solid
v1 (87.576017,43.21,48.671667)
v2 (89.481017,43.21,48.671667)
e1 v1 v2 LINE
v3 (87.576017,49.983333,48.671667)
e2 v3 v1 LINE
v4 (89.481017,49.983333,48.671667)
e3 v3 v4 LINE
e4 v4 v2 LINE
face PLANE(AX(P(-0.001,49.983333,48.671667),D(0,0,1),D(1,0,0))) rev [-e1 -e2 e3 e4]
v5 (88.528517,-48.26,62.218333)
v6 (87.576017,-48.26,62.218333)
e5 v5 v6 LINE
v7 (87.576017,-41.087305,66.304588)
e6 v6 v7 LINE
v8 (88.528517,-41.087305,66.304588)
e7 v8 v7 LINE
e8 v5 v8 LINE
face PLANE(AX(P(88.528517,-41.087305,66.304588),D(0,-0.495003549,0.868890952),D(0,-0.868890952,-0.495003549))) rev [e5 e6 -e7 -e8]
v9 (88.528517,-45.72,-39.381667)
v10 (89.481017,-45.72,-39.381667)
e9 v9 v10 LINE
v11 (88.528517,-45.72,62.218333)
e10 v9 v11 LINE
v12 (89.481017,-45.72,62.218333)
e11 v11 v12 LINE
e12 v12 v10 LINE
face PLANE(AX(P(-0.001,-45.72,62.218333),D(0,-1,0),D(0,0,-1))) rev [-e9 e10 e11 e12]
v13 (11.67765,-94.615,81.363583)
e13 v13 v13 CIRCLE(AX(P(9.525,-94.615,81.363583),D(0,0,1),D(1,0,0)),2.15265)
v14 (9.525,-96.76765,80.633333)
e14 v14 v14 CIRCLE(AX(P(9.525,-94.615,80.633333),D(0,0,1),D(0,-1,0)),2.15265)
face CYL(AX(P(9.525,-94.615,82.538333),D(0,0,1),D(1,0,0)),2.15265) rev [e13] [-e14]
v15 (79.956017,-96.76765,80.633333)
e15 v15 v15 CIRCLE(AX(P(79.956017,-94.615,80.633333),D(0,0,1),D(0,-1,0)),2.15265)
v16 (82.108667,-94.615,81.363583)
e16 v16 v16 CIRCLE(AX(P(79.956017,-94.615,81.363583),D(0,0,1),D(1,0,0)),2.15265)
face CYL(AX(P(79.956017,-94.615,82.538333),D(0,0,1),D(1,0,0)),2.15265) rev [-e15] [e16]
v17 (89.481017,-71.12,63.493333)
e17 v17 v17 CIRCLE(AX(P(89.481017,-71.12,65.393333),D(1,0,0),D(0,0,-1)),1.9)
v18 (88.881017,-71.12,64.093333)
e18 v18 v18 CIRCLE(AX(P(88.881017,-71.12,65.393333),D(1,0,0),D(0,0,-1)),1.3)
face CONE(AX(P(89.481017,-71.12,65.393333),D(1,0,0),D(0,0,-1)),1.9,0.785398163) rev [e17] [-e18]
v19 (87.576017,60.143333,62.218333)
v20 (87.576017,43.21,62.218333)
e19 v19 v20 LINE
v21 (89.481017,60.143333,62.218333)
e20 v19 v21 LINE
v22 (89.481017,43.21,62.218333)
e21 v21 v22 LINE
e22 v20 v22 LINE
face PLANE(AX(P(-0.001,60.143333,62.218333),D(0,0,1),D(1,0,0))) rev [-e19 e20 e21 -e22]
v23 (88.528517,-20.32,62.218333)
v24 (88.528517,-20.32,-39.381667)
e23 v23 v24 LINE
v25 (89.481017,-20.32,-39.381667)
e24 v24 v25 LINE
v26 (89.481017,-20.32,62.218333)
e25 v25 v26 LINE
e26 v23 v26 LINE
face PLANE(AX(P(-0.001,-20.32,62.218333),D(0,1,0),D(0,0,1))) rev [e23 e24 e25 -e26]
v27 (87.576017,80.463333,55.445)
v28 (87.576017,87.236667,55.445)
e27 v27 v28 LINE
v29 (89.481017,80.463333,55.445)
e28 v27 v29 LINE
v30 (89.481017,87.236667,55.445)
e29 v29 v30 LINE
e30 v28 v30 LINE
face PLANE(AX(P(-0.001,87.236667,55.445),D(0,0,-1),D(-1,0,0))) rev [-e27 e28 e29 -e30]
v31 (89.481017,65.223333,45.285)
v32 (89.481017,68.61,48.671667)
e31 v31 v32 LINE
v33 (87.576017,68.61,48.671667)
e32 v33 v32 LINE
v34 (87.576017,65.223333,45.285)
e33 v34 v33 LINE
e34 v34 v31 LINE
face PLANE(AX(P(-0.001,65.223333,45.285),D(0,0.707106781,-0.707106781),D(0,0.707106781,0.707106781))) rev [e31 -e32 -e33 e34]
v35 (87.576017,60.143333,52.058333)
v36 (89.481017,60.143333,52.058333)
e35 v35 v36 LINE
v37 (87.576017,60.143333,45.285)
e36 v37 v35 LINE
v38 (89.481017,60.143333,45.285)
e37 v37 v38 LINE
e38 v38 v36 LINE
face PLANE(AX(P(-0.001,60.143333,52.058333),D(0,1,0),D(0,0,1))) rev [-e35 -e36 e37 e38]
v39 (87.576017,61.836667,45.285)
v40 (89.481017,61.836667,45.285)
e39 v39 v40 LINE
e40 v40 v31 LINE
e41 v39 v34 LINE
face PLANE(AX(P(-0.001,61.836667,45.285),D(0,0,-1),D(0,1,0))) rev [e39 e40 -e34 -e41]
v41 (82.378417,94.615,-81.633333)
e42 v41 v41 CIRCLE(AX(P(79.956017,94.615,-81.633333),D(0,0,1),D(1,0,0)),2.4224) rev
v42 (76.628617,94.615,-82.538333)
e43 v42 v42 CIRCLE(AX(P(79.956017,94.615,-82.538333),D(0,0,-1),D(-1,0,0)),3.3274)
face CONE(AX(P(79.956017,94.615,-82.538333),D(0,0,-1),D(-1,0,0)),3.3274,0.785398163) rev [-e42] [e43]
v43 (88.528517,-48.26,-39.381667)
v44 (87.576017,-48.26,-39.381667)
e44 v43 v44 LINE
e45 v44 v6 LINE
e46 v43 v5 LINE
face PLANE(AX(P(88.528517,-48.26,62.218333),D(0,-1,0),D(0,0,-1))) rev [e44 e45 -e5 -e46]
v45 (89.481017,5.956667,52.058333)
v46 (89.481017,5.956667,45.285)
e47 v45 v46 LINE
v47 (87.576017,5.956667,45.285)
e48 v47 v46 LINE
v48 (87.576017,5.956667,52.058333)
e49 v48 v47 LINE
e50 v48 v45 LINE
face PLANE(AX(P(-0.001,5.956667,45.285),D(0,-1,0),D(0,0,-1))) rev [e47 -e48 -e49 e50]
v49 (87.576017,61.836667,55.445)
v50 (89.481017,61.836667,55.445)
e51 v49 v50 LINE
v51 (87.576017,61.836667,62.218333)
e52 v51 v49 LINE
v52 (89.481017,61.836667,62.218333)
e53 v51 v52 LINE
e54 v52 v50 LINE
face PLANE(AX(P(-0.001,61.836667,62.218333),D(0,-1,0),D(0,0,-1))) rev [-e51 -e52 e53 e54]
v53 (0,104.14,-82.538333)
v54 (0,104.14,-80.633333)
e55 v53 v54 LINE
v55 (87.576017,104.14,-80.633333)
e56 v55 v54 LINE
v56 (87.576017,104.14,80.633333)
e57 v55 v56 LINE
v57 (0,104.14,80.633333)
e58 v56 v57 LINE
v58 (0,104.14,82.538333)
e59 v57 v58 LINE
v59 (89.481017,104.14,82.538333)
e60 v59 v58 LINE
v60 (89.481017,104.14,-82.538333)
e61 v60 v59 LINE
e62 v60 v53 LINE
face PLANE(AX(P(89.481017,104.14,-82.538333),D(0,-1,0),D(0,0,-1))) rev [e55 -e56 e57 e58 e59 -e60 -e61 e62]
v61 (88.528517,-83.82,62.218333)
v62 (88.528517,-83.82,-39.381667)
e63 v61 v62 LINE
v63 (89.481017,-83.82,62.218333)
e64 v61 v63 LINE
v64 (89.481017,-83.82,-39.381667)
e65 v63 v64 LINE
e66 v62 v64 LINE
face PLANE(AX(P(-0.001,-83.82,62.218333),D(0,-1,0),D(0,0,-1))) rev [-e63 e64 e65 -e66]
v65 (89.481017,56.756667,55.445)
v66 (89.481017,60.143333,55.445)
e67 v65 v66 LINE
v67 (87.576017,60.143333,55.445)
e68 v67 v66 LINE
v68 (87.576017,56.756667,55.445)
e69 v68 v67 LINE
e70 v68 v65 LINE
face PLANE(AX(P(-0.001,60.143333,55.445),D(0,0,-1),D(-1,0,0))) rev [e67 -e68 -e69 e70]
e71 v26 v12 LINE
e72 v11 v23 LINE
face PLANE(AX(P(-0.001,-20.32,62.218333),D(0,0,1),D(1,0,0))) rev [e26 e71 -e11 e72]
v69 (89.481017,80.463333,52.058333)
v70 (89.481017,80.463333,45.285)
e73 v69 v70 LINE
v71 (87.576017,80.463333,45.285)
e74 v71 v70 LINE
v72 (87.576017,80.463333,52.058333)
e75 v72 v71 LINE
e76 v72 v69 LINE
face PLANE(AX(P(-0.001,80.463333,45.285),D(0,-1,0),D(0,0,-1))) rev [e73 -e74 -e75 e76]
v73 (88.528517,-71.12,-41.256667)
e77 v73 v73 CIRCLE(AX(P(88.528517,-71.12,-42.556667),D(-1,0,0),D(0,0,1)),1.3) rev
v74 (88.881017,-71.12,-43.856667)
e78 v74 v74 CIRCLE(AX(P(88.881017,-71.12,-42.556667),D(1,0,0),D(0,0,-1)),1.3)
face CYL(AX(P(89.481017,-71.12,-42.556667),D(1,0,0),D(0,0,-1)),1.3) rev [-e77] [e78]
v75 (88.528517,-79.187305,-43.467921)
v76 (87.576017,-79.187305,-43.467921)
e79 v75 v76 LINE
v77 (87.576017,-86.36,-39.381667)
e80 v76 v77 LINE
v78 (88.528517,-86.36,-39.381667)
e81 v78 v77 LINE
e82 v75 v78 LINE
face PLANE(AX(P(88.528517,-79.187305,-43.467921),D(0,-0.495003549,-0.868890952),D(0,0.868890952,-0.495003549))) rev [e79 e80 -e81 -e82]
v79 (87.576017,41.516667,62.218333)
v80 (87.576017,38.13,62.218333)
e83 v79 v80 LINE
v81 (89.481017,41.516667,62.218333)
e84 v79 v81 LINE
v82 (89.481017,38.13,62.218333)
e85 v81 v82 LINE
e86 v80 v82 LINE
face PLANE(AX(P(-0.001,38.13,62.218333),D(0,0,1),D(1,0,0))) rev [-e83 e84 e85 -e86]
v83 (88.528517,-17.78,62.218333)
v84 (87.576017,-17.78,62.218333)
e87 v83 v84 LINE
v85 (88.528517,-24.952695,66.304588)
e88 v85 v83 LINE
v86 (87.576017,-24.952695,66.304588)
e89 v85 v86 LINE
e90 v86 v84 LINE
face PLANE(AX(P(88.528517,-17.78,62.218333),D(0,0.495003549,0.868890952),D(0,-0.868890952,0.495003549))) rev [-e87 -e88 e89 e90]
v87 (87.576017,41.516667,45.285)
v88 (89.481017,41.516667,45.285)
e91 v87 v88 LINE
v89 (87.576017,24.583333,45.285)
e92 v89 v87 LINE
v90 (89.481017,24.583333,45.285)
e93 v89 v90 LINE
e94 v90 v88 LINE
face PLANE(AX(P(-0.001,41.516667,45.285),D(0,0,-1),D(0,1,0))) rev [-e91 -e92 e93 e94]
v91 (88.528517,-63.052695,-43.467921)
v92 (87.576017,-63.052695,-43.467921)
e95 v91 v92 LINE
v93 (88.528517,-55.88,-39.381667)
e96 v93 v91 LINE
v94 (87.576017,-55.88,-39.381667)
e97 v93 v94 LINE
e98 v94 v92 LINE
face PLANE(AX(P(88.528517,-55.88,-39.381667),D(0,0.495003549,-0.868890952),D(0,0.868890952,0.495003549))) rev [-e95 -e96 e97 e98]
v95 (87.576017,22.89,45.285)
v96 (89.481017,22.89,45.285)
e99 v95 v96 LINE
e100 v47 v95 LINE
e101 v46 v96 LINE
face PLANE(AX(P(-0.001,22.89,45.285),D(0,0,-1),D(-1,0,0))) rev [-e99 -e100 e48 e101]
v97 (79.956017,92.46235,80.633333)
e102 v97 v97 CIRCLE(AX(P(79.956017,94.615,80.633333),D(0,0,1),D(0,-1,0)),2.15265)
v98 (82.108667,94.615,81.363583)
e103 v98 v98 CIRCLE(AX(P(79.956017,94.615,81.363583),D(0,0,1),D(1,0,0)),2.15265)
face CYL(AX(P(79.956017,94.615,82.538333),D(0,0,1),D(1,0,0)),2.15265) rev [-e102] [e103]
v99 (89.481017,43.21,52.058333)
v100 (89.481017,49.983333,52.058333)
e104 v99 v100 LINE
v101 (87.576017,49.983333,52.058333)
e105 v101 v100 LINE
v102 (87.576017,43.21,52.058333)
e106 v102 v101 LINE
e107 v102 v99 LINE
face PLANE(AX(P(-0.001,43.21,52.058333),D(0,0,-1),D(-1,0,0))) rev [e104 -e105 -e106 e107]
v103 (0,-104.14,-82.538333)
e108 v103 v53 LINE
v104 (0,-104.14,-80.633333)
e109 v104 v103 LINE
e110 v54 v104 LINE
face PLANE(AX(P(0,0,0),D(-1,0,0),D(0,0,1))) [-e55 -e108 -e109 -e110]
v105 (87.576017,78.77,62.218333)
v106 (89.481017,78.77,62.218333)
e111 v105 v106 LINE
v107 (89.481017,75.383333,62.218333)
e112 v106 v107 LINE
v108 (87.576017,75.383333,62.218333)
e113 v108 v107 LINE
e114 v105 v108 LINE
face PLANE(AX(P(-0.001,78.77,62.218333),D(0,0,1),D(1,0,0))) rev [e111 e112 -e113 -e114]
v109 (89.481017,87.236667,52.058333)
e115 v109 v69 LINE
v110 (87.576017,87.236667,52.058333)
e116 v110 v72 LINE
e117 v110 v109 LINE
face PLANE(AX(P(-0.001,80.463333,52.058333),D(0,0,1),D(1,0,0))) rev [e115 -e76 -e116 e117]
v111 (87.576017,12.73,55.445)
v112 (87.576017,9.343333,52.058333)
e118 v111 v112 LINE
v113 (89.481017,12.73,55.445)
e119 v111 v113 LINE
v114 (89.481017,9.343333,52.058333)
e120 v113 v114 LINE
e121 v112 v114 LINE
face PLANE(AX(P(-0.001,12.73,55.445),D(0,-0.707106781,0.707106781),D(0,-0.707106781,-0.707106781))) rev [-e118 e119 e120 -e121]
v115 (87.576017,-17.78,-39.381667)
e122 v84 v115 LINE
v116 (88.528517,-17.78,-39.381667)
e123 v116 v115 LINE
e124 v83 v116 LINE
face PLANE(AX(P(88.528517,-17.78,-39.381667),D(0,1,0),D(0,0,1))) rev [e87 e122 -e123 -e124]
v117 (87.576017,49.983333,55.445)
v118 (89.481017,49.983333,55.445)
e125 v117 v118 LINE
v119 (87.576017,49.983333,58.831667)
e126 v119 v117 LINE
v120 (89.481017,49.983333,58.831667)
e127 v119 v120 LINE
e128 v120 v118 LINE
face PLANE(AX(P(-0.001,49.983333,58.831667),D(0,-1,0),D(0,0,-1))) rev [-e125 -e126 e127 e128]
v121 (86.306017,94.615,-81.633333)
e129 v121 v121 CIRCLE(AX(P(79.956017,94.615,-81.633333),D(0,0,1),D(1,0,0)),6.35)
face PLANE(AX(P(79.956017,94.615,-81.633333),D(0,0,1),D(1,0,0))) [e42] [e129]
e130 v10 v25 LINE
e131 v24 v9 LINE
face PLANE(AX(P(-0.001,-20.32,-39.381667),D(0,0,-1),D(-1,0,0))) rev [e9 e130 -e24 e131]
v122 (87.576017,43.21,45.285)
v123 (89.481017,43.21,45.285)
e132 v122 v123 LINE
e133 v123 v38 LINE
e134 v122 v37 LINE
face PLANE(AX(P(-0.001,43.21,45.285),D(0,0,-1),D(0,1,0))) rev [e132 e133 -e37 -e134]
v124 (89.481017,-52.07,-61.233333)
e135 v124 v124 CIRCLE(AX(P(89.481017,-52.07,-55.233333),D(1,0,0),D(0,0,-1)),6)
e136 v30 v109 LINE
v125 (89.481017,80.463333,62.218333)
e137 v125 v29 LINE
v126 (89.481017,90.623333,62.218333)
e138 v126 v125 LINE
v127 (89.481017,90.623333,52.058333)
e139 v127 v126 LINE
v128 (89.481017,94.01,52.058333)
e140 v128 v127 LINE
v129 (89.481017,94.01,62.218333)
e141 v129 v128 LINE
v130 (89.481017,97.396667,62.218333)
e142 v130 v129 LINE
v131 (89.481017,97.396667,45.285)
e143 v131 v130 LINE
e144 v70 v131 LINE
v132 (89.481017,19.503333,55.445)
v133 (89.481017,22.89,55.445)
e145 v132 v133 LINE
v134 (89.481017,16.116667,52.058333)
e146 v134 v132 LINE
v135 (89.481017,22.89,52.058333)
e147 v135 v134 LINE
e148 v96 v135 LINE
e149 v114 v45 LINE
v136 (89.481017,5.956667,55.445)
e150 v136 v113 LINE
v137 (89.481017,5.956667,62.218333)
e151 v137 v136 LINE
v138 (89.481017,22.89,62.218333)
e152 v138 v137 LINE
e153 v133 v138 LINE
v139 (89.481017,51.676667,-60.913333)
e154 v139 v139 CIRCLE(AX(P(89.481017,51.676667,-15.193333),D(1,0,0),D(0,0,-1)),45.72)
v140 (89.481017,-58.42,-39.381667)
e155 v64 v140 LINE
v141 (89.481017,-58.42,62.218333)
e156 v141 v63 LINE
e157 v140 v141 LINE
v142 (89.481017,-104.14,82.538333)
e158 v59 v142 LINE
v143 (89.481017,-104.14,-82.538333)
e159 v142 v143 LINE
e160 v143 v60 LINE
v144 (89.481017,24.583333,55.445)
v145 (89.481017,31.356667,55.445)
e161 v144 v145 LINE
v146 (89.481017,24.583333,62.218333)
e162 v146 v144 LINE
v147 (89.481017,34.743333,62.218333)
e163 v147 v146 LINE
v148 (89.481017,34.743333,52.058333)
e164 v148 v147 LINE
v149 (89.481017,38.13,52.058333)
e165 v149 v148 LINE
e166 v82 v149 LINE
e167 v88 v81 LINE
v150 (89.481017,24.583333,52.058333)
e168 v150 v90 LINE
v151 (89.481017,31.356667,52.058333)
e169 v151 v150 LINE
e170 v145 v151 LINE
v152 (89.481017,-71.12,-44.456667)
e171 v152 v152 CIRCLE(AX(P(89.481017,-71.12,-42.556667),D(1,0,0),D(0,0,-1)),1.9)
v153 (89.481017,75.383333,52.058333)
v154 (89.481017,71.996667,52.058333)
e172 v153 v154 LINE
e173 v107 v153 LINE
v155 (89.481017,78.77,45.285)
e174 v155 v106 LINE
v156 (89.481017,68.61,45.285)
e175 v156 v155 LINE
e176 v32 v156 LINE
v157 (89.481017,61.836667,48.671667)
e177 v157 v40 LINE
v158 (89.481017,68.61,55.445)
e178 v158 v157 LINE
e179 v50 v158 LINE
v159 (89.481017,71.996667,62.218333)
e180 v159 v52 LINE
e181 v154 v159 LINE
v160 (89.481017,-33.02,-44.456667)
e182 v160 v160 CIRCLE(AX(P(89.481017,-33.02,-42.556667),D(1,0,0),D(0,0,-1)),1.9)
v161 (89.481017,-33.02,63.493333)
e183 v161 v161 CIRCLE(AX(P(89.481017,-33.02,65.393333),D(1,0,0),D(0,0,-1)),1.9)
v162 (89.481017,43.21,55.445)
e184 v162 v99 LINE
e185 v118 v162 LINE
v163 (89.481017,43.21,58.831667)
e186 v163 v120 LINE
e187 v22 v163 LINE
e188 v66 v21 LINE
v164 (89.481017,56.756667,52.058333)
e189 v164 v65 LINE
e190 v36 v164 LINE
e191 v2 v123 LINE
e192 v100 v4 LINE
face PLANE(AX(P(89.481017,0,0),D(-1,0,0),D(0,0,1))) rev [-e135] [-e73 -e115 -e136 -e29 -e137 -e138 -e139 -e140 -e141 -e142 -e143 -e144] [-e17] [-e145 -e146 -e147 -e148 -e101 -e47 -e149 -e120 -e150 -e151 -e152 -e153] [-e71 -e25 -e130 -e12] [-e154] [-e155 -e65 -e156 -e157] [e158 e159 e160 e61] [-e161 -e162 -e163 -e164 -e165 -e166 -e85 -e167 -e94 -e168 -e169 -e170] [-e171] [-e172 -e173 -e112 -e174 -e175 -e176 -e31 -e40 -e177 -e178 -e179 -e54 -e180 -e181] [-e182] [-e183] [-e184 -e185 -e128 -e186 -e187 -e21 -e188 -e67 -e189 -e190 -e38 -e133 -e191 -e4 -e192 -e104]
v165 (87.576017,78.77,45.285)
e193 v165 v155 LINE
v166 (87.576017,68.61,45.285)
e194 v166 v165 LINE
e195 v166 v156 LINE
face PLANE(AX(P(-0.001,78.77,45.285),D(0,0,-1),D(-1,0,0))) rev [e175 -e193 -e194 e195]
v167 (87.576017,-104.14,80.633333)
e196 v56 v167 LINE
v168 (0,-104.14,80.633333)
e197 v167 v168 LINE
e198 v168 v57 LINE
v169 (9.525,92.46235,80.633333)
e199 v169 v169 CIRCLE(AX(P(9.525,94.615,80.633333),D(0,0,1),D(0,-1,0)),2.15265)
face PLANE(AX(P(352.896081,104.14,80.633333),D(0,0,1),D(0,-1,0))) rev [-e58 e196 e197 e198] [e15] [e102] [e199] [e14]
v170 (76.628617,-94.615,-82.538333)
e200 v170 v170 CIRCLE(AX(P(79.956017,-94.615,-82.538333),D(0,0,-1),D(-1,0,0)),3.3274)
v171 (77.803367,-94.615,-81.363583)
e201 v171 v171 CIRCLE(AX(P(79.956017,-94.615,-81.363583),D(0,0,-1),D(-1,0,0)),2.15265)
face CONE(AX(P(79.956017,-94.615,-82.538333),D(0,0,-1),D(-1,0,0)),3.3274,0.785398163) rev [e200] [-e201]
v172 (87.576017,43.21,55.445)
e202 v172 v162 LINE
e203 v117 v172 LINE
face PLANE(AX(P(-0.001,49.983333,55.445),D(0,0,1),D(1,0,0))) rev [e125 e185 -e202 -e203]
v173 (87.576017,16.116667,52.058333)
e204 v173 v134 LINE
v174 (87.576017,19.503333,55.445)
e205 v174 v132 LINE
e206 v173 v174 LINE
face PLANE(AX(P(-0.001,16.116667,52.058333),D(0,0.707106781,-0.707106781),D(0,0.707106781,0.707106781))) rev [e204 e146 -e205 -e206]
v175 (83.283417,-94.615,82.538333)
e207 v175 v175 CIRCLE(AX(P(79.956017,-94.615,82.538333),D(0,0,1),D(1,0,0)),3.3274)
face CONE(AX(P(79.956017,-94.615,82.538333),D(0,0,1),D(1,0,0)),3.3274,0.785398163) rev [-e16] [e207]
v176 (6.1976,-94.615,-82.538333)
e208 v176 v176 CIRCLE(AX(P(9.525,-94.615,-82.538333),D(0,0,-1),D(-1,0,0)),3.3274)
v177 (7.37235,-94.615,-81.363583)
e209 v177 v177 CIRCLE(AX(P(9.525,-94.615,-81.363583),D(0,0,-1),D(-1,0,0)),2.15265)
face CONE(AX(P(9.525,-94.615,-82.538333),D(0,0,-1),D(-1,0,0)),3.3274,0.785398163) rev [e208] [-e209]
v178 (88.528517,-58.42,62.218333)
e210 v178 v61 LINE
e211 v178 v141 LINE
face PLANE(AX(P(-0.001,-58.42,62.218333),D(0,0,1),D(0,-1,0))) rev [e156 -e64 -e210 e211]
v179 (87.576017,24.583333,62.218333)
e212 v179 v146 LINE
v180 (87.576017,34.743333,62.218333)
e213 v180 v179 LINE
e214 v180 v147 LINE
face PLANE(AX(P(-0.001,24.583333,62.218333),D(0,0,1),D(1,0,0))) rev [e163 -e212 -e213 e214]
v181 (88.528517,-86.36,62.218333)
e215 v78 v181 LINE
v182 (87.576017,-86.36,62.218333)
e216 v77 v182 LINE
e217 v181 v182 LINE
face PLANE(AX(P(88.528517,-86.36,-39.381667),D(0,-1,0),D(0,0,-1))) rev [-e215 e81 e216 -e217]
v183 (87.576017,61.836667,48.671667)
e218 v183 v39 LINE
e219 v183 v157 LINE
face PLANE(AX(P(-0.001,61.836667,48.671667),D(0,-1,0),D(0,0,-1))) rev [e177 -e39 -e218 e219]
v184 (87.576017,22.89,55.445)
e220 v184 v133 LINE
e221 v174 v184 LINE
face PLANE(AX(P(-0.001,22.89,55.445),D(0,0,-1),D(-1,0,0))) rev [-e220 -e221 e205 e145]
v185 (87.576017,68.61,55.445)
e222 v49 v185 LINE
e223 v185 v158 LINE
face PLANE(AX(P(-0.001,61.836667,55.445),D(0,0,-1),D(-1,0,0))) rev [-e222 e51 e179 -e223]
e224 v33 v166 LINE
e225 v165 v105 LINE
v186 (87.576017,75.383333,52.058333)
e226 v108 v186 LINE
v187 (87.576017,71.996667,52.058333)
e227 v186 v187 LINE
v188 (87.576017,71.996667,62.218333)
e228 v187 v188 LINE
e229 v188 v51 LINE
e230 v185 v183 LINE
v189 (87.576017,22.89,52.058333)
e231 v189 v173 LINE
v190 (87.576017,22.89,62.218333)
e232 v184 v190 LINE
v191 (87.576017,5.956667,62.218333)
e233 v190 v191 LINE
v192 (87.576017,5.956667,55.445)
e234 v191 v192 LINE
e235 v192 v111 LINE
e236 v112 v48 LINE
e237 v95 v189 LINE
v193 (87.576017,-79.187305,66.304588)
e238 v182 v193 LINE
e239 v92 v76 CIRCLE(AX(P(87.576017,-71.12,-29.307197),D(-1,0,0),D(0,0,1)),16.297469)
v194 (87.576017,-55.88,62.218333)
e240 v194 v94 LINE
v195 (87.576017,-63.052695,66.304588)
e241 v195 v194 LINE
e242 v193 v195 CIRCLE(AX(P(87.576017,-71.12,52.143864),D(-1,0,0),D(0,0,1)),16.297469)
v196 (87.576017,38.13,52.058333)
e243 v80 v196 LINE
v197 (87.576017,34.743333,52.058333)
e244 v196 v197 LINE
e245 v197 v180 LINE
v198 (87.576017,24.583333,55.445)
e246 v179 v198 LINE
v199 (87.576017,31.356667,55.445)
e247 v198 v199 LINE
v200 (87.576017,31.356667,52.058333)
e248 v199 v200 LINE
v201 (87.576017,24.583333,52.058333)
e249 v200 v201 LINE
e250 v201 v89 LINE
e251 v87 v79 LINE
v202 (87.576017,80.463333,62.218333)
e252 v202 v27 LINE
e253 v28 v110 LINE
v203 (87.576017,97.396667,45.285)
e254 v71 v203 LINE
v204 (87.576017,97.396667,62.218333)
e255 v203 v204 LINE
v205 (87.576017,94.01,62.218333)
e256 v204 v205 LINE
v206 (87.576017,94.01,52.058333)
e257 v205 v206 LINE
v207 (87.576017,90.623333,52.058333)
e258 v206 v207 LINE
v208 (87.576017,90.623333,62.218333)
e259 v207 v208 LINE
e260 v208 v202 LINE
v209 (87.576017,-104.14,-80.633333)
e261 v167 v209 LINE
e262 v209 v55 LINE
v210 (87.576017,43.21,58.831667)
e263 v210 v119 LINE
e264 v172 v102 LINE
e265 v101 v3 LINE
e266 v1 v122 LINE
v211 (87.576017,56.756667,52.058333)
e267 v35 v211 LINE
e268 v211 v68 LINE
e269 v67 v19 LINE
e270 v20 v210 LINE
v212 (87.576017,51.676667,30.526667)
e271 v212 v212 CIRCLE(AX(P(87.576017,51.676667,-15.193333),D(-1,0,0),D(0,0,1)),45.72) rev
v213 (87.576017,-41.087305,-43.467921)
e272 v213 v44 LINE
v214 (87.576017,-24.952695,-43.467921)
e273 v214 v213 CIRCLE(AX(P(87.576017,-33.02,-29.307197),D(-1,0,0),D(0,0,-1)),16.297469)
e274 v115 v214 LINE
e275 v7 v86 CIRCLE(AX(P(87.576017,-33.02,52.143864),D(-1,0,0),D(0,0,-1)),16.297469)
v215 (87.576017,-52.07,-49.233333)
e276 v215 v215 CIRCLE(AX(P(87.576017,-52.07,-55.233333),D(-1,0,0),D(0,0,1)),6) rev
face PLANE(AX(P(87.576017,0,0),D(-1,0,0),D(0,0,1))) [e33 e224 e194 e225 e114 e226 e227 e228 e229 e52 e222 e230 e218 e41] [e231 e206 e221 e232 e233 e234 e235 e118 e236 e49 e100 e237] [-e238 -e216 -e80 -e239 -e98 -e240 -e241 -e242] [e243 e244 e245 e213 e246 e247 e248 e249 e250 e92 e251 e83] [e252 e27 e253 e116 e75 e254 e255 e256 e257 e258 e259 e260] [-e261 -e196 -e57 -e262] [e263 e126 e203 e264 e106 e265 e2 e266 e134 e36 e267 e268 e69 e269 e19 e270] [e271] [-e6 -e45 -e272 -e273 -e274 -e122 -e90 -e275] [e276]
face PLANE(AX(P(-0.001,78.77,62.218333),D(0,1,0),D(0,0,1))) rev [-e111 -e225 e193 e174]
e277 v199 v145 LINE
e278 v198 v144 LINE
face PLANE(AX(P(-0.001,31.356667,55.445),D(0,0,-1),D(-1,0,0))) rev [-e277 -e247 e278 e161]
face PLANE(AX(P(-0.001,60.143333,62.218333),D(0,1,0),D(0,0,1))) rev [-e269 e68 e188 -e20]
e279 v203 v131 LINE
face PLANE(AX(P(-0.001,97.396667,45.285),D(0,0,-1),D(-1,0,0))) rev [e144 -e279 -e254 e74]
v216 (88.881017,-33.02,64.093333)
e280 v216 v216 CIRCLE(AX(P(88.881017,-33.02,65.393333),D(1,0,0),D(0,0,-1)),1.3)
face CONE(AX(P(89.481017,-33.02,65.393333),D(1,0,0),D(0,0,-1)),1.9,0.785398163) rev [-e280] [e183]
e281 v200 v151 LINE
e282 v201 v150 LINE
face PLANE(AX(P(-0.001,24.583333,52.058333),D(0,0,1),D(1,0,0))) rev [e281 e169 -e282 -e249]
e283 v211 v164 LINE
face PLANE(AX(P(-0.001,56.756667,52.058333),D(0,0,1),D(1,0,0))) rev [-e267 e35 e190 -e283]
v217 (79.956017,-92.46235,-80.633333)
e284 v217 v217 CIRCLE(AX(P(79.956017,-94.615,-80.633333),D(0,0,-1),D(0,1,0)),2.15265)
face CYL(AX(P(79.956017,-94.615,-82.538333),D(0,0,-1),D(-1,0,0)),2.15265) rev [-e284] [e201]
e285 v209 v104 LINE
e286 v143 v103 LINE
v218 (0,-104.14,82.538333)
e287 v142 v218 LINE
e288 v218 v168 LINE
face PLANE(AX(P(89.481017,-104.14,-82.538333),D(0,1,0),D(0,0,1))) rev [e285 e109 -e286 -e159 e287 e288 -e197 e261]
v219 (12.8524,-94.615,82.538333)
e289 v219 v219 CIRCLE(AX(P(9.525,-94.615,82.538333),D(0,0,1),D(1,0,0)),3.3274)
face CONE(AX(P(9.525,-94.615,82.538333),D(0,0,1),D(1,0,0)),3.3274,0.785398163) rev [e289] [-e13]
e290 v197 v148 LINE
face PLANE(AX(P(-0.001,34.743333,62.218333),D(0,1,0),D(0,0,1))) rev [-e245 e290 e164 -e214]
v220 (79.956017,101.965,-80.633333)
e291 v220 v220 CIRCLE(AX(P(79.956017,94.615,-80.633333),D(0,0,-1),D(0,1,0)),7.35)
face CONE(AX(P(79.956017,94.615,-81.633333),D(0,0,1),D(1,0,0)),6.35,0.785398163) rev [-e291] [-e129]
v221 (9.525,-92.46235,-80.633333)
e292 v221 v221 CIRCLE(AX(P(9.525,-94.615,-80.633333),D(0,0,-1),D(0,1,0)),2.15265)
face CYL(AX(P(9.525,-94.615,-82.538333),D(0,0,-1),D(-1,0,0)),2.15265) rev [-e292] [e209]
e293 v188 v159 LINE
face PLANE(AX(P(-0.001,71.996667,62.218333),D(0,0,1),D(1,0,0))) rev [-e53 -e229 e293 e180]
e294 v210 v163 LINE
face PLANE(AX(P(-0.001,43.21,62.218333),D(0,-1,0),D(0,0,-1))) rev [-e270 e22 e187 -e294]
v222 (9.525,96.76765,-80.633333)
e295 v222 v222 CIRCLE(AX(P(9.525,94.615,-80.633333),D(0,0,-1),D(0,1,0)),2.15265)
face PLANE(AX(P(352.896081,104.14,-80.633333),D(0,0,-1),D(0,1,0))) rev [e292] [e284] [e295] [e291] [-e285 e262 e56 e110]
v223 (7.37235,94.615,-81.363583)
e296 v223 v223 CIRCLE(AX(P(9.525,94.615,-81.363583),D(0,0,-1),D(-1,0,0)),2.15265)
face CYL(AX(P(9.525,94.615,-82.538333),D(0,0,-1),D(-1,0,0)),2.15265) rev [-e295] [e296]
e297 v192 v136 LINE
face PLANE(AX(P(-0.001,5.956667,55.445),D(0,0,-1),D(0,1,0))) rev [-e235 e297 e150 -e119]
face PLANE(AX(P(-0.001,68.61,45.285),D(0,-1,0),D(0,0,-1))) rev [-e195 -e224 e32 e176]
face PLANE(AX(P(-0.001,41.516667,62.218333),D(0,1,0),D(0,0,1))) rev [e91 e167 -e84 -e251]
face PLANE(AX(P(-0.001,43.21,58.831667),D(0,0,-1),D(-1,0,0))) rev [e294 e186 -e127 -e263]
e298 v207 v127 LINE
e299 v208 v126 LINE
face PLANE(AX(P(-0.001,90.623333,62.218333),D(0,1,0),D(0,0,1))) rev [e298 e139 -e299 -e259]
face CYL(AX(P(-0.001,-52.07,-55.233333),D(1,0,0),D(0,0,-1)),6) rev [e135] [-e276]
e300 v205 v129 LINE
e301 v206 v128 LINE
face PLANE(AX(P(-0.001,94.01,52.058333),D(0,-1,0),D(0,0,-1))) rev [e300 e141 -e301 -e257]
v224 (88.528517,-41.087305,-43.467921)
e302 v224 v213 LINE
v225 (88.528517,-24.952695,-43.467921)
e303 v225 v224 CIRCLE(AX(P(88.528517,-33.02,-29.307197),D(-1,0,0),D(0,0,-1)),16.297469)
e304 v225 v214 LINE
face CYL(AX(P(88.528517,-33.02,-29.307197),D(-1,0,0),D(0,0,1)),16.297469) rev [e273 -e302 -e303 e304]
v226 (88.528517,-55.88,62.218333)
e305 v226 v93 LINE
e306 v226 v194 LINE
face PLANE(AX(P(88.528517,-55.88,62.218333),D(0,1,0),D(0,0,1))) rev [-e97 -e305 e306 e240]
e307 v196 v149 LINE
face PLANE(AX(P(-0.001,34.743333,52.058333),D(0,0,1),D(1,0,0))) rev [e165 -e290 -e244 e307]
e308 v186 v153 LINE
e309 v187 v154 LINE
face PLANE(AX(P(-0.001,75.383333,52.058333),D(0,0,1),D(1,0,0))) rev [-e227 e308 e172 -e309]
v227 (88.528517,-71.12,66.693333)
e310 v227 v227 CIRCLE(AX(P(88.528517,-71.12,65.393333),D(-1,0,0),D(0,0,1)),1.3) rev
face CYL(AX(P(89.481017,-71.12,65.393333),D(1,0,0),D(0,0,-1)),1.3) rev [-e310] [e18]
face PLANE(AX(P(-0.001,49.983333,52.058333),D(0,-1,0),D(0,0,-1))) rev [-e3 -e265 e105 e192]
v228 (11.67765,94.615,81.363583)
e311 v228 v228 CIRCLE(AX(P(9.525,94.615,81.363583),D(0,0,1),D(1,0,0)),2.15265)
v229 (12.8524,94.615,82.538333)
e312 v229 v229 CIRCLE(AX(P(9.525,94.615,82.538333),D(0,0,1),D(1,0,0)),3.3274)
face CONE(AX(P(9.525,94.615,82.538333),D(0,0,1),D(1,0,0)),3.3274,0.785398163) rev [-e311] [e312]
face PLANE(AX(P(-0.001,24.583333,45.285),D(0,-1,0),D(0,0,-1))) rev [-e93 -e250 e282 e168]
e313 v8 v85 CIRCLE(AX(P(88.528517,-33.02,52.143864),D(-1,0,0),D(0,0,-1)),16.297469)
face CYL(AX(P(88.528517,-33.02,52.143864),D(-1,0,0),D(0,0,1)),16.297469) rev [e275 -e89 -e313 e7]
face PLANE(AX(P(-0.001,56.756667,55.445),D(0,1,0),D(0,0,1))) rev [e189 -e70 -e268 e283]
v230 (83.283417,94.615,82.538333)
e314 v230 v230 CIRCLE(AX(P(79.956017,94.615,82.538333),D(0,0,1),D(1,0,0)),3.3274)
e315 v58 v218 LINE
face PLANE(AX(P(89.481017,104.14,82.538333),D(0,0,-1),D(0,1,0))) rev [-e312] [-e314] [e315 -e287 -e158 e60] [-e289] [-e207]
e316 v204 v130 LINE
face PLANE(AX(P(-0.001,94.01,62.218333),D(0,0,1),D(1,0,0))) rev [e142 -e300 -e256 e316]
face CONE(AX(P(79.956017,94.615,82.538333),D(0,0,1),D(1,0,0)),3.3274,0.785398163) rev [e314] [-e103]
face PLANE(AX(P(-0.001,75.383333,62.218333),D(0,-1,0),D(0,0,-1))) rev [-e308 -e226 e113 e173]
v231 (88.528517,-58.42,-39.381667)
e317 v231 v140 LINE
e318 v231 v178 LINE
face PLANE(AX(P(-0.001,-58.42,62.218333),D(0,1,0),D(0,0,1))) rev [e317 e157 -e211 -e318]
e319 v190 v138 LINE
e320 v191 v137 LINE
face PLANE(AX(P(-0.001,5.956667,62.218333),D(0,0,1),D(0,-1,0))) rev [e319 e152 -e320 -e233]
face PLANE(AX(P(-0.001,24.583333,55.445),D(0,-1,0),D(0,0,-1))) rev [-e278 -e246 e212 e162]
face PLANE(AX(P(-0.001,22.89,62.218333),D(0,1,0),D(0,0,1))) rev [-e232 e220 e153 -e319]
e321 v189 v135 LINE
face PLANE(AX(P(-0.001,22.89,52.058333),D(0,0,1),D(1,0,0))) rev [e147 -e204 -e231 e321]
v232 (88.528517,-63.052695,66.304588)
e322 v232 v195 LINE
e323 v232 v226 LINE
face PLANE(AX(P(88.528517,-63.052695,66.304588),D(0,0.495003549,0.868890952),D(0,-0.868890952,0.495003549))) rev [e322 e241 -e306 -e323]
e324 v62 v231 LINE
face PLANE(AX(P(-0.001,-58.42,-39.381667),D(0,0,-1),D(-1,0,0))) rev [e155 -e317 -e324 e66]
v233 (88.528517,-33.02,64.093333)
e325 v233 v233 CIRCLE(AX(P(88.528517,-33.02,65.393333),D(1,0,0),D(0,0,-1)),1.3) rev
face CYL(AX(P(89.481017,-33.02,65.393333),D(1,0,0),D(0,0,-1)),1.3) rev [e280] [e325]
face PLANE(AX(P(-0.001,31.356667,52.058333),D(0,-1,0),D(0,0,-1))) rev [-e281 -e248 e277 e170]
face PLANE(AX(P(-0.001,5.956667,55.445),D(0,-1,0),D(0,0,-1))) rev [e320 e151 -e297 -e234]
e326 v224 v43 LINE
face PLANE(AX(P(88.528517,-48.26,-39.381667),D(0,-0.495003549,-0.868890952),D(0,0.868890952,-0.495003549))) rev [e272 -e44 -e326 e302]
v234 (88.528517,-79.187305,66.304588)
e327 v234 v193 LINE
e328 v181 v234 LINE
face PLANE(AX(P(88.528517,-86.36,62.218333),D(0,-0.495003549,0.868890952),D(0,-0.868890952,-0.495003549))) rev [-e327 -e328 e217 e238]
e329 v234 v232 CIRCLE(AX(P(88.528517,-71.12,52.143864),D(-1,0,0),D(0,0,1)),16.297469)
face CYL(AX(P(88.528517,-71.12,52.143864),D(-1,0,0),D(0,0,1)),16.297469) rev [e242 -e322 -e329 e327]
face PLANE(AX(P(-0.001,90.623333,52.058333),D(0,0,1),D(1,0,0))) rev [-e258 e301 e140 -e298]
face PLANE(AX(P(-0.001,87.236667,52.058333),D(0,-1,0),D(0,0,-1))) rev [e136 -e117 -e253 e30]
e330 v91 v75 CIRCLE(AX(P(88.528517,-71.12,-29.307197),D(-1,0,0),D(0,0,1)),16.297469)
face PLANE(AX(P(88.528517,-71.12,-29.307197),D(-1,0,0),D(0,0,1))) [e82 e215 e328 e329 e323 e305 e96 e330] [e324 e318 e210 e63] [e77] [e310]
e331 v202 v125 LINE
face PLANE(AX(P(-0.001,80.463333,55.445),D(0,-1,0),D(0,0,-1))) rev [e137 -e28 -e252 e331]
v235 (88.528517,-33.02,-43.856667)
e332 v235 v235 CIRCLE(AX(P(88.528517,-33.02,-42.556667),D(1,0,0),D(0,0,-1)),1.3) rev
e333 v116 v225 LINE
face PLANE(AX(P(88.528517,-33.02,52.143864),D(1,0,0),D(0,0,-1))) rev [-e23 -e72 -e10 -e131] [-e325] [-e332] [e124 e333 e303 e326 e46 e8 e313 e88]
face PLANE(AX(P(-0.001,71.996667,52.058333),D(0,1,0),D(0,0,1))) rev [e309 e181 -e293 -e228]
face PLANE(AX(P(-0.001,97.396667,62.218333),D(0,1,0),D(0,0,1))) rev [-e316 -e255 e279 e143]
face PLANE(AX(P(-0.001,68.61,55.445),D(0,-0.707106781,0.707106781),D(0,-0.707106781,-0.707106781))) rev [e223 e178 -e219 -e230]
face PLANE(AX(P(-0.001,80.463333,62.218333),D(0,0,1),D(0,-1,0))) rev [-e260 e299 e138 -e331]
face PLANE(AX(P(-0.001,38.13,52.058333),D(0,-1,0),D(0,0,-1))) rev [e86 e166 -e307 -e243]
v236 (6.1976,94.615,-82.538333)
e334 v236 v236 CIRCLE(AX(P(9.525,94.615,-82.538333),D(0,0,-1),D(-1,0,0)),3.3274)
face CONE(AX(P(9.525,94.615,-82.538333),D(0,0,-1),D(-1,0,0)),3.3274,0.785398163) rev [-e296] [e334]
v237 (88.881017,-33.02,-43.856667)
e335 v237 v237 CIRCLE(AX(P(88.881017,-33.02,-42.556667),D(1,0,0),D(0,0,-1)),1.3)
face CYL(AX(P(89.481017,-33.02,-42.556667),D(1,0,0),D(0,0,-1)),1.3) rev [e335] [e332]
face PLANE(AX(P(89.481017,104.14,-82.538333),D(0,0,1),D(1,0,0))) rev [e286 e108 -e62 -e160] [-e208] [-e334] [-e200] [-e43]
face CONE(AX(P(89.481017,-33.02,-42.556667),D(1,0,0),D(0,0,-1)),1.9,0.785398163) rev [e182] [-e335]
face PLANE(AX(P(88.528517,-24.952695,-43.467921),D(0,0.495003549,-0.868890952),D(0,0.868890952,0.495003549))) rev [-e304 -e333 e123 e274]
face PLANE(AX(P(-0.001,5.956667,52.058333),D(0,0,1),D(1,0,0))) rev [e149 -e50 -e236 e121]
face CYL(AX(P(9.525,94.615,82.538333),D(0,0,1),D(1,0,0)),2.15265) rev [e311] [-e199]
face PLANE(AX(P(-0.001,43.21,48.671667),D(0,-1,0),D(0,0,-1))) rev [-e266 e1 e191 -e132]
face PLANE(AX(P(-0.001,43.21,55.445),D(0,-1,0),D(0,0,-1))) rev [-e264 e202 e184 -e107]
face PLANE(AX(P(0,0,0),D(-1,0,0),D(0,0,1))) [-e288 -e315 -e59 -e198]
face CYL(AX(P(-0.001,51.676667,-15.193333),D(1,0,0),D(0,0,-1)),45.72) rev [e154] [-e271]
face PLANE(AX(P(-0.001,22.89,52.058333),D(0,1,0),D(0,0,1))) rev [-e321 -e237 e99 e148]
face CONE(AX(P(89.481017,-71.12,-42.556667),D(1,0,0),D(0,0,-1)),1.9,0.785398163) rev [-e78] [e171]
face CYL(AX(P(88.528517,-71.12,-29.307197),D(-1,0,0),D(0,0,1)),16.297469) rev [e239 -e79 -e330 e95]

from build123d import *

# Parameters (mm, degrees)
SKETCH1_W                       = 165.076666628
SKETCH1_H                       = 208.28
BOSS_EXTRUDE1_DEPTH             = 89.481016872
SKETCH3_W                       = 161.266666628
SKETCH3_H                       = 208.28
CUT_EXTRUDE1_DEPTH              = 87.576016872
F_6_CLEARANCE_HOLE1_AT_2_COUNT  = 2
F_6_CLEARANCE_HOLE1_AT_2_PITCH  = 70.431016872
F_6_CLEARANCE_HOLE1_AT_3_COUNT  = 2
F_6_CLEARANCE_HOLE1_AT_3_PITCH  = 201.912161688
F_6_CLEARANCE_HOLE1_AT_4_COUNT  = 2
F_6_CLEARANCE_HOLE1_AT_4_PITCH  = 189.23
F_6_CLEARANCE_HOLE2_D           = 4.3053
F_6_CLEARANCE_HOLE2_DEPTH       = 6.858
F_6_CLEARANCE_HOLE2_CSINK_D     = 6.6548
F_6_CLEARANCE_HOLE2_CSINK_ANGLE = 90
F_6_CLEARANCE_HOLE2_TIP         = 1.293442612
CUT_EXTRUDE2_REACH              = 162.202
SKETCH8_R                       = 45.72
CUT_EXTRUDE3_REACH              = 162.202
SKETCH9_R                       = 6
SKETCH9_W                       = 101.6
SKETCH9_H                       = 25.4
CUT_EXTRUDE4_DEPTH              = 0.9525
CUT_EXTRUDE6_REACH              = 162.202
SKETCH13_R                      = 6.35
CUT_EXTRUDE7_DEPTH              = 1
CHAMFER1_SIZE                   = 1


# Read off the part's stored shape, not the designer's step: M2 Clearance Hole1
with BuildPart() as part:
    # Sketch1 → Boss-Extrude1 (new body)
    with BuildSketch(Plane(origin=(0, 0, 0), x_dir=(0, 0, -1), z_dir=(1, 0, 0))):
        Rectangle(SKETCH1_W, SKETCH1_H)
    extrude(amount=BOSS_EXTRUDE1_DEPTH)

    # Sketch3 → Cut-Extrude1 (cut)
    with BuildSketch(Plane.ZY):
        Rectangle(SKETCH3_W, SKETCH3_H)
    extrude(amount=-CUT_EXTRUDE1_DEPTH, mode=Mode.SUBTRACT)

    # Sketch5 → #6 Clearance Hole1 (revolve, cut)
    with BuildSketch(Plane(origin=(9.525, -94.615, -82.538333314), x_dir=(0, 1, 0), z_dir=(1, 0, 0))):
        Polygon((0, 0), (0, 1.905), (2.15265, 1.905), (2.15265, 1.17475), (3.3274, 0), align=None)
    f_6_clearance_hole1 = revolve(axis=Axis((9.525, -94.615, -88.888333314), (0, 0, 1)), mode=Mode.SUBTRACT)

    # #6 Clearance Hole1 at 2: #6 Clearance Hole1 ×2
    with Locations(*[(i * F_6_CLEARANCE_HOLE1_AT_2_PITCH, 0, 0) for i in range(1, F_6_CLEARANCE_HOLE1_AT_2_COUNT)]):
        add(f_6_clearance_hole1, mode=Mode.SUBTRACT)

    # #6 Clearance Hole1 at 3: #6 Clearance Hole1 ×2
    with Locations(*[Vector(0.34882008237197215, 0.9371897087217778, 0) * (i * F_6_CLEARANCE_HOLE1_AT_3_PITCH) for i in range(1, F_6_CLEARANCE_HOLE1_AT_3_COUNT)]):
        add(f_6_clearance_hole1, mode=Mode.SUBTRACT)

    # #6 Clearance Hole1 at 4: #6 Clearance Hole1 ×2
    with Locations(*[(0, i * F_6_CLEARANCE_HOLE1_AT_4_PITCH, 0) for i in range(1, F_6_CLEARANCE_HOLE1_AT_4_COUNT)]):
        add(f_6_clearance_hole1, mode=Mode.SUBTRACT)

    # #6 Clearance Hole2
    with Locations(Plane.XY.offset(82.538333314)):
        with Locations((9.525, 94.615), (79.956016872, 94.615), (79.956016872, -94.615), (9.525, -94.615)):
            CounterSinkHole(F_6_CLEARANCE_HOLE2_D / 2, F_6_CLEARANCE_HOLE2_CSINK_D / 2, depth=F_6_CLEARANCE_HOLE2_DEPTH, counter_sink_angle=F_6_CLEARANCE_HOLE2_CSINK_ANGLE)
            with Locations((0, 0, -(F_6_CLEARANCE_HOLE2_DEPTH + F_6_CLEARANCE_HOLE2_TIP / 2))):  # 118° drill point
                Cone(0, F_6_CLEARANCE_HOLE2_D / 2, F_6_CLEARANCE_HOLE2_TIP, mode=Mode.SUBTRACT)

    # Sketch8 → Cut-Extrude2 (cut, up to next)
    with BuildSketch(Plane(origin=(89.481016872, 0, 0), x_dir=(0, 0, -1), z_dir=(1, 0, 0)), mode=Mode.PRIVATE) as cut_extrude2_sk1:
        with Locations((15.193333225, 51.676666667)):
            Circle(SKETCH8_R)
    cut_extrude2_tool1 = extrude(cut_extrude2_sk1.sketch, amount=-CUT_EXTRUDE2_REACH, mode=Mode.PRIVATE) & part.part
    add(cut_extrude2_tool1.solids().sort_by_distance((89.481017, 51.676667, -15.193333))[0], mode=Mode.SUBTRACT)

    # Sketch9 → Cut-Extrude3 (cut, up to next)
    with BuildSketch(Plane(origin=(89.481016872, 0, 0), x_dir=(0, 0, -1), z_dir=(1, 0, 0)), mode=Mode.PRIVATE) as cut_extrude3_sk1:
        with Locations((55.233333314, -52.07)):
            Circle(SKETCH9_R)
    cut_extrude3_tool1 = extrude(cut_extrude3_sk1.sketch, amount=-CUT_EXTRUDE3_REACH, mode=Mode.PRIVATE) & part.part
    # Sketch9 → Cut-Extrude3 (cut, up to next)
    with BuildSketch(Plane(origin=(89.481016872, 0, 0), x_dir=(0, 0, -1), z_dir=(1, 0, 0)), mode=Mode.PRIVATE) as cut_extrude3_sk2:
        with Locations((-11.418333314, -33.02)):
            Rectangle(SKETCH9_W, SKETCH9_H)
    cut_extrude3_tool2 = extrude(cut_extrude3_sk2.sketch, amount=-CUT_EXTRUDE3_REACH, mode=Mode.PRIVATE) & part.part
    # Sketch9 → Cut-Extrude3 (cut, up to next)
    with BuildSketch(Plane(origin=(89.481016872, 0, 0), x_dir=(0, 0, -1), z_dir=(1, 0, 0)), mode=Mode.PRIVATE) as cut_extrude3_sk3:
        with Locations((-11.418333314, -71.12)):
            Rectangle(SKETCH9_W, SKETCH9_H)
    cut_extrude3_tool3 = extrude(cut_extrude3_sk3.sketch, amount=-CUT_EXTRUDE3_REACH, mode=Mode.PRIVATE) & part.part
    add(cut_extrude3_tool1.solids().sort_by_distance((89.481017, -52.07, -55.233333))[0], mode=Mode.SUBTRACT)
    add(cut_extrude3_tool2.solids().sort_by_distance((89.481017, -33.02, 11.418333))[0], mode=Mode.SUBTRACT)
    add(cut_extrude3_tool3.solids().sort_by_distance((89.481017, -71.12, 11.418333))[0], mode=Mode.SUBTRACT)

    # M2 Clearance Hole1 outline → M2 Clearance Hole1 (revolve, cut)
    with BuildSketch(Plane(origin=(0, -33.02, 65.393333314), x_dir=(0, 1, 0), z_dir=(0, 0, -1))):
        Polygon((0, 87.576016872), (1.3, 87.576016872), (1.3, 88.881016872), (1.9, 89.481016872), (0, 89.481016872), align=None)
    revolve(axis=Axis((0, -33.02, 65.393333314), (1, 0, 0)), mode=Mode.SUBTRACT)

    # M2 Clearance Hole1 2 outline → M2 Clearance Hole1 2 (revolve, cut)
    with BuildSketch(Plane(origin=(0, -33.02, -42.556666686), x_dir=(0, 1, 0), z_dir=(0, 0, -1))):
        Polygon((0, 87.576016872), (1.3, 87.576016872), (1.3, 88.881016872), (1.9, 89.481016872), (0, 89.481016872), align=None)
    revolve(axis=Axis((0, -33.02, -42.556666686), (1, 0, 0)), mode=Mode.SUBTRACT)

    # M2 Clearance Hole1 3 outline → M2 Clearance Hole1 3 (revolve, cut)
    with BuildSketch(Plane(origin=(0, -71.12, -42.556666686), x_dir=(0, 1, 0), z_dir=(0, 0, -1))):
        Polygon((0, 87.576016872), (1.3, 87.576016872), (1.3, 88.881016872), (1.9, 89.481016872), (0, 89.481016872), align=None)
    revolve(axis=Axis((0, -71.12, -42.556666686), (1, 0, 0)), mode=Mode.SUBTRACT)

    # M2 Clearance Hole1 4 outline → M2 Clearance Hole1 4 (revolve, cut)
    with BuildSketch(Plane(origin=(0, -71.12, 65.393333314), x_dir=(0, 1, 0), z_dir=(0, 0, -1))):
        Polygon((0, 87.576016872), (1.3, 87.576016872), (1.3, 88.881016872), (1.9, 89.481016872), (0, 89.481016872), align=None)
    revolve(axis=Axis((0, -71.12, 65.393333314), (1, 0, 0)), mode=Mode.SUBTRACT)

    # Sketch12 → Cut-Extrude4 (cut)
    with BuildSketch(Plane.ZY.offset(-87.576016872)):
        with BuildLine():
            Line((-39.381666686, -17.78), (62.218333314, -17.78))
            Line((62.218333314, -17.78), (66.304587615, -24.952694807))
            ThreePointArc((66.304587615, -24.952694807), (68.441333314, -33.02), (66.304587615, -41.087305193))
            Line((66.304587615, -41.087305193), (62.218333314, -48.26))
            Line((62.218333314, -48.26), (-39.381666686, -48.26))
            Line((-39.381666686, -48.26), (-43.467920986, -41.087305193))
            ThreePointArc((-43.467920986, -41.087305193), (-45.604666686, -33.02), (-43.467920986, -24.952694807))
            Line((-43.467920986, -24.952694807), (-39.381666686, -17.78))
        make_face()
        with BuildLine():
            Line((-43.467920986, -79.187305193), (-39.381666686, -86.36))
            Line((-39.381666686, -86.36), (62.218333314, -86.36))
            Line((62.218333314, -86.36), (66.304587615, -79.187305193))
            ThreePointArc((66.304587615, -79.187305193), (68.441333314, -71.12), (66.304587615, -63.052694807))
            Line((66.304587615, -63.052694807), (62.218333314, -55.88))
            Line((62.218333314, -55.88), (-39.381666686, -55.88))
            Line((-39.381666686, -55.88), (-43.467920986, -63.052694807))
            ThreePointArc((-43.467920986, -63.052694807), (-45.604666686, -71.12), (-43.467920986, -79.187305193))
        make_face()
    extrude(amount=-CUT_EXTRUDE4_DEPTH, mode=Mode.SUBTRACT)

    # Lettering Outline → Cut-Extrude6 (cut, up to next)
    with BuildSketch(Plane(origin=(89.481016872, 0, 0), x_dir=(0, 0, -1), z_dir=(1, 0, 0)), mode=Mode.PRIVATE) as cut_extrude6_sk1:
        Polygon((-62.218333314, 78.77), (-62.218333314, 75.383333333), (-52.058333314, 75.383333333), (-52.058333314, 71.996666667), (-62.218333314, 71.996666667), (-62.218333314, 61.836666667), (-55.444999981, 61.836666667), (-55.444999981, 68.61), (-48.671666648, 61.836666667), (-45.284999981, 61.836666667), (-45.284999981, 65.223333333), (-48.671666648, 68.61), (-45.284999981, 68.61), (-45.284999981, 78.77), align=None)
    cut_extrude6_tool1 = extrude(cut_extrude6_sk1.sketch, amount=-CUT_EXTRUDE6_REACH, mode=Mode.PRIVATE) & part.part
    # Lettering Outline → Cut-Extrude6 (cut, up to next)
    with BuildSketch(Plane(origin=(89.481016872, 0, 0), x_dir=(0, 0, -1), z_dir=(1, 0, 0)), mode=Mode.PRIVATE) as cut_extrude6_sk2:
        Polygon((-62.218333314, 80.463333333), (-62.218333314, 90.623333333), (-52.058333314, 90.623333333), (-52.058333314, 94.01), (-62.218333314, 94.01), (-62.218333314, 97.396666667), (-45.284999981, 97.396666667), (-45.284999981, 80.463333333), (-52.058333314, 80.463333333), (-52.058333314, 87.236666667), (-55.444999981, 87.236666667), (-55.444999981, 80.463333333), align=None)
    cut_extrude6_tool2 = extrude(cut_extrude6_sk2.sketch, amount=-CUT_EXTRUDE6_REACH, mode=Mode.PRIVATE) & part.part
    # Lettering Outline → Cut-Extrude6 (cut, up to next)
    with BuildSketch(Plane(origin=(89.481016872, 0, 0), x_dir=(0, 0, -1), z_dir=(1, 0, 0)), mode=Mode.PRIVATE) as cut_extrude6_sk3:
        Polygon((-62.218333314, 24.583333333), (-62.218333314, 34.743333333), (-52.058333314, 34.743333333), (-52.058333314, 38.13), (-62.218333314, 38.13), (-62.218333314, 41.516666667), (-45.284999981, 41.516666667), (-45.284999981, 24.583333333), (-52.058333314, 24.583333333), (-52.058333314, 31.356666667), (-55.444999981, 31.356666667), (-55.444999981, 24.583333333), align=None)
    cut_extrude6_tool3 = extrude(cut_extrude6_sk3.sketch, amount=-CUT_EXTRUDE6_REACH, mode=Mode.PRIVATE) & part.part
    # Lettering Outline → Cut-Extrude6 (cut, up to next)
    with BuildSketch(Plane(origin=(89.481016872, 0, 0), x_dir=(0, 0, -1), z_dir=(1, 0, 0)), mode=Mode.PRIVATE) as cut_extrude6_sk4:
        Polygon((-62.218333314, 5.956666667), (-62.218333314, 22.89), (-55.444999981, 22.89), (-55.444999981, 19.503333333), (-52.058333314, 16.116666667), (-52.058333314, 22.89), (-45.284999981, 22.89), (-45.284999981, 5.956666667), (-52.058333314, 5.956666667), (-52.058333314, 9.343333333), (-55.444999981, 12.73), (-55.444999981, 5.956666667), align=None)
    cut_extrude6_tool4 = extrude(cut_extrude6_sk4.sketch, amount=-CUT_EXTRUDE6_REACH, mode=Mode.PRIVATE) & part.part
    # Lettering Outline → Cut-Extrude6 (cut, up to next)
    with BuildSketch(Plane(origin=(89.481016872, 0, 0), x_dir=(0, 0, -1), z_dir=(1, 0, 0)), mode=Mode.PRIVATE) as cut_extrude6_sk5:
        Polygon((-62.218333314, 43.21), (-58.831666648, 43.21), (-58.831666648, 49.983333333), (-55.444999981, 49.983333333), (-55.444999981, 43.21), (-52.058333314, 43.21), (-52.058333314, 49.983333333), (-48.671666648, 49.983333333), (-48.671666648, 43.21), (-45.284999981, 43.21), (-45.284999981, 60.143333333), (-52.058333314, 60.143333333), (-52.058333314, 56.756666667), (-55.444999981, 56.756666667), (-55.444999981, 60.143333333), (-62.218333314, 60.143333333), align=None)
    cut_extrude6_tool5 = extrude(cut_extrude6_sk5.sketch, amount=-CUT_EXTRUDE6_REACH, mode=Mode.PRIVATE) & part.part
    add(cut_extrude6_tool1.solids().sort_by_distance((89.481017, 70.491481, 53.476681))[0], mode=Mode.SUBTRACT)
    add(cut_extrude6_tool2.solids().sort_by_distance((89.481017, 88.93, 53.243667))[0], mode=Mode.SUBTRACT)
    add(cut_extrude6_tool3.solids().sort_by_distance((89.481017, 33.05, 53.243667))[0], mode=Mode.SUBTRACT)
    add(cut_extrude6_tool4.solids().sort_by_distance((89.481017, 14.423333, 53.751667))[0], mode=Mode.SUBTRACT)
    add(cut_extrude6_tool5.solids().sort_by_distance((89.481017, 52.354, 53.751667))[0], mode=Mode.SUBTRACT)

    # Sketch13 → Cut-Extrude7 (cut)
    with BuildSketch(Plane.XY.offset(-80.633333314)):
        with Locations((79.956016872, 94.615)):
            Circle(SKETCH13_R)
    extrude(amount=-CUT_EXTRUDE7_DEPTH, mode=Mode.SUBTRACT)

    # Chamfer1
    chamfer1_edges = [part.edges().sort_by_distance(p)[0] for p in [
        (73.606016872, 94.615, -80.633333314),
    ]]
    chamfer(chamfer1_edges, length=CHAMFER1_SIZE - 0.0001)  # a hair under: the kernel refuses the full size


solid = part.part
